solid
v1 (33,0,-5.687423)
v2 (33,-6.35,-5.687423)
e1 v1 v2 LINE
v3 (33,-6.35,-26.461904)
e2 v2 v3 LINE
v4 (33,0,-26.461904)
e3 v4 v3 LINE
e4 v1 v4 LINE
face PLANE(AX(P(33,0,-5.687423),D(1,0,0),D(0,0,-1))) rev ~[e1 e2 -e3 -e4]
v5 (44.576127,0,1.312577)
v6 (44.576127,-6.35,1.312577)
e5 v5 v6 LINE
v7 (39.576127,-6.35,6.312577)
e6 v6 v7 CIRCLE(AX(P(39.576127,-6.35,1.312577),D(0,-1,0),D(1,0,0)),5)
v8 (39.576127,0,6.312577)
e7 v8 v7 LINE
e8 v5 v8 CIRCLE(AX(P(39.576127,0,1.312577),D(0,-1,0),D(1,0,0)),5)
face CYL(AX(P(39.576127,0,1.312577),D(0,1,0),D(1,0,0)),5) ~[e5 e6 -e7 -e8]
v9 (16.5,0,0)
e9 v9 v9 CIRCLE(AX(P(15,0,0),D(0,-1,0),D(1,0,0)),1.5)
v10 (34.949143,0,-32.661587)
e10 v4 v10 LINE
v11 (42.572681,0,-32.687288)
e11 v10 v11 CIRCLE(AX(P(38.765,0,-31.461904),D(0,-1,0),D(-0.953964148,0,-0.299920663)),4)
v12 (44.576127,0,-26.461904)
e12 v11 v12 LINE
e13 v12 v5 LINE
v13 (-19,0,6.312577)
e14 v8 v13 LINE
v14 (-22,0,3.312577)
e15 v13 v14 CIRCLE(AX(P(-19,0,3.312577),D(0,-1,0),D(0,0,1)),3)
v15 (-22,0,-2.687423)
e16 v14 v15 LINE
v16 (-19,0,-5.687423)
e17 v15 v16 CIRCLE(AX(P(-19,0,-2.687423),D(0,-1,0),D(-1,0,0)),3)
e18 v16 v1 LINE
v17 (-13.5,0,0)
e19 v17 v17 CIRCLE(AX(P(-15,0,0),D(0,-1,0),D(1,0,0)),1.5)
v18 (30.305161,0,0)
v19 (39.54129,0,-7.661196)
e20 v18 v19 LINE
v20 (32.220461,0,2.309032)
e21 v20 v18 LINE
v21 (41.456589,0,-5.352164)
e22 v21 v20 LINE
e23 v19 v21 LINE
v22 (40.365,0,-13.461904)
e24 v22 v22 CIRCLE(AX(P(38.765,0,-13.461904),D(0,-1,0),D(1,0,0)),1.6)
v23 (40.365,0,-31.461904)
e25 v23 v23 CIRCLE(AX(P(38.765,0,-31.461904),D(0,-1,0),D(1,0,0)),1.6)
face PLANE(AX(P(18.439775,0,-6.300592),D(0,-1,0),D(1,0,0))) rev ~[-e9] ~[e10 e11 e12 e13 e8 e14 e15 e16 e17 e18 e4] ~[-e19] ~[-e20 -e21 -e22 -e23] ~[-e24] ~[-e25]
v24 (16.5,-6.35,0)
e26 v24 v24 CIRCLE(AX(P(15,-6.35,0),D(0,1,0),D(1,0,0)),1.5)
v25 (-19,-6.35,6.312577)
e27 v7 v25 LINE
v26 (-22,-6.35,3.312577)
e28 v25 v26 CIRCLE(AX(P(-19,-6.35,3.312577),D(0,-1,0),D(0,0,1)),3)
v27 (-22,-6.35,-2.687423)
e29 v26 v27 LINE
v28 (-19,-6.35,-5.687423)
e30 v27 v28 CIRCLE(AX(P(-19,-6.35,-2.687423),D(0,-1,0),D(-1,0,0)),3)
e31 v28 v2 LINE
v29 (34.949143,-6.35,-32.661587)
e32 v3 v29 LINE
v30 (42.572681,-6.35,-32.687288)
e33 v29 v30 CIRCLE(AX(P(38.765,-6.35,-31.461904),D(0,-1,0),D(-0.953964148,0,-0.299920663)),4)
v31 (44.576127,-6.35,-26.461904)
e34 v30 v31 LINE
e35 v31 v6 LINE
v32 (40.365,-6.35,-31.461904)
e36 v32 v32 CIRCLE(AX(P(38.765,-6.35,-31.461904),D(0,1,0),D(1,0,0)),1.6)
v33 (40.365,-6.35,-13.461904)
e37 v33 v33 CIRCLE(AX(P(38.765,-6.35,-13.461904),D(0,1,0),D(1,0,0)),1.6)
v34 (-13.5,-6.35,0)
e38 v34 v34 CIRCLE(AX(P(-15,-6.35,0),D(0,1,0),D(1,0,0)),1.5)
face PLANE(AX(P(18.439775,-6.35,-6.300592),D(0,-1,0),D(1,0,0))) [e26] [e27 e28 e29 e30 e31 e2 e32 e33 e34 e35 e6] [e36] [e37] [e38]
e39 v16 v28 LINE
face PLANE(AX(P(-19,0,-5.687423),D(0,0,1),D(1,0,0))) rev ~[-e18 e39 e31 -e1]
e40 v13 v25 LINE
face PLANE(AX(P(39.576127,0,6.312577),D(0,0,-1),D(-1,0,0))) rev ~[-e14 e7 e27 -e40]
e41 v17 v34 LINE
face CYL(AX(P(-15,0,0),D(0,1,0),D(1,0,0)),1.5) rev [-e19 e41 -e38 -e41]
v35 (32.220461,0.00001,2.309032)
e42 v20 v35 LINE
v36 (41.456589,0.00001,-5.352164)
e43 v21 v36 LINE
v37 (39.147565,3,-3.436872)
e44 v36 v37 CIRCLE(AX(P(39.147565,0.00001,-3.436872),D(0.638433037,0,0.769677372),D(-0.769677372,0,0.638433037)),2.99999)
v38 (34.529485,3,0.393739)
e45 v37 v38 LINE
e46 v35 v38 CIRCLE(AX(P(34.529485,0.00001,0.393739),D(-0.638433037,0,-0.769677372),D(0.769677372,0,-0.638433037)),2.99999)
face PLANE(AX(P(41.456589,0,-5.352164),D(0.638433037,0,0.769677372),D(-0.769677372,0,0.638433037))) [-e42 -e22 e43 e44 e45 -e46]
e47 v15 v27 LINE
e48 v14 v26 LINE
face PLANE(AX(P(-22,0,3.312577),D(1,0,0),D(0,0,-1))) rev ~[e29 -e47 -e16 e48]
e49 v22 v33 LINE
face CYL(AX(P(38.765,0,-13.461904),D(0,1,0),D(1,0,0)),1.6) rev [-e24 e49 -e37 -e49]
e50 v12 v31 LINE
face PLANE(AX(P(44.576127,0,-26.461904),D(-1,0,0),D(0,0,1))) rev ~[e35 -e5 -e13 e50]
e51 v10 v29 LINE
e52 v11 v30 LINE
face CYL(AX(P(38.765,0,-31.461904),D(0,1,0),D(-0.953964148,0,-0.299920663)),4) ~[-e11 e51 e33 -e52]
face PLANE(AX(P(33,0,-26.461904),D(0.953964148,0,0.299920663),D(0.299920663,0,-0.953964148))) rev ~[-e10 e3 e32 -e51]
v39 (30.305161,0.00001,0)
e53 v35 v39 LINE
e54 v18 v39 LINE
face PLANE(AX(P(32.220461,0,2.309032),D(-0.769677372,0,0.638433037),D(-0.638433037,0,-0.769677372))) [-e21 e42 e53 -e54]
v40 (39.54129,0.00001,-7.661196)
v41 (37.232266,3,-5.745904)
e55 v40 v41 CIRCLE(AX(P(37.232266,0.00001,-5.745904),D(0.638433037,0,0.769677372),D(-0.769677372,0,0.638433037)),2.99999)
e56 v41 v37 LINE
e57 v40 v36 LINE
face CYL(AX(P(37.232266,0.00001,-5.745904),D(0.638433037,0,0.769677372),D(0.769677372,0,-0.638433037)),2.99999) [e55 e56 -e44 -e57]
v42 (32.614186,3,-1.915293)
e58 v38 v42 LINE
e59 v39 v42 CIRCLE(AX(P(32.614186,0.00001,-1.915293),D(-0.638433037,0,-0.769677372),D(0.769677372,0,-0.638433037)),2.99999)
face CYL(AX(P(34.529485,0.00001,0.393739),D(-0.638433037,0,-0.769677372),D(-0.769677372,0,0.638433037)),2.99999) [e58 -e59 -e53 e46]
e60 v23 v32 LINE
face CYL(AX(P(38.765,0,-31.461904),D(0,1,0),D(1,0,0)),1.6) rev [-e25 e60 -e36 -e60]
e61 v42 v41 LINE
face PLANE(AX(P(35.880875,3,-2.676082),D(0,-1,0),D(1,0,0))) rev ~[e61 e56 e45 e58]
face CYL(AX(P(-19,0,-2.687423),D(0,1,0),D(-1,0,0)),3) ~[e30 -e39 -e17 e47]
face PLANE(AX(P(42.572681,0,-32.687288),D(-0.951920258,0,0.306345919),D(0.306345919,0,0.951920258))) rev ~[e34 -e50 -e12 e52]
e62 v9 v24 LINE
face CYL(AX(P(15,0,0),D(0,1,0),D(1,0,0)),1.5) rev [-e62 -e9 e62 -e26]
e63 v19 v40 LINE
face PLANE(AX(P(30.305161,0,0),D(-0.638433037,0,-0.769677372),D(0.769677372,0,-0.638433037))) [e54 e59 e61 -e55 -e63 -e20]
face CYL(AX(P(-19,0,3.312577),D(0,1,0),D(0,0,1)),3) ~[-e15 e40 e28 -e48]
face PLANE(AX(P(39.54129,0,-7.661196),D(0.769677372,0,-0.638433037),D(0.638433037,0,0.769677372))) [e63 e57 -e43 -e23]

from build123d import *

# Parameters (mm, degrees)
F1_DEPTH = 6.35
F2_R     = 1.5
F2_R_2   = 1.6
F3_DEPTH = 6.351
F5_DEPTH = 3
F6_R     = 2.99999


# Not quite as in the source:
# - a fillet or chamfer is up to 0.001 mm smaller than in the source, because OpenCascade refuses the exact size


with BuildPart() as f1:
    # F0 (on Front) → F1 (new body)
    with BuildSketch(Plane.XZ):
        with BuildLine():
            Line((33, 6.3125771578), (-19, 6.3125771578))
            ThreePointArc((-19, 6.3125771578), (-21.1213203436, 5.4338975014), (-22, 3.3125771578))
            Line((-22, 3.3125771578), (-22, -2.6874228422))
            ThreePointArc((-22, -2.6874228422), (-21.1213203436, -4.8087431858), (-19, -5.6874228422))
            Line((-19, -5.6874228422), (33, -5.6874228422))
            Line((33, -5.6874228422), (33, -18.461904466))
            Line((33, -18.461904466), (33, -26.461904466))
            Line((33, -26.461904466), (34.9491434073, -32.6615871174))
            ThreePointArc((34.9491434073, -32.6615871174), (38.7515149865, -35.4618817353), (42.5726810332, -32.6872881404))
            Line((42.5726810332, -32.6872881404), (44.5761270821, -26.461904466))
            Line((44.5761270821, -26.461904466), (44.5761270821, -18.461904466))
            Line((44.5761270821, -18.461904466), (44.5761270821, 1.3125771578))
            ThreePointArc((44.5761270821, 1.3125771578), (43.111660988, 4.8481110637), (39.5761270821, 6.3125771578))
            Line((39.5761270821, 6.3125771578), (33, 6.3125771578))
        make_face()
    extrude(amount=F1_DEPTH)

    # F2 (on face) → F3 (cut, through all)
    with BuildSketch(Plane.XZ):
        with Locations((-15, 0)):
            Circle(F2_R)
        with Locations((15, 0)):
            Circle(F2_R)
        with Locations((38.765, -13.461904466)):
            Circle(F2_R_2)
        with Locations((38.765, -31.461904466)):
            Circle(F2_R_2)
    extrude(amount=F3_DEPTH, mode=Mode.SUBTRACT)

    # F4 (on face) → F5 (join)
    with BuildSketch(Plane.XZ):
        Polygon((41.4565890705, -5.352164329), (32.2204606053, 2.3090321163), (30.305161494, 0), (39.5412899592, -7.6611964453), align=None)
    extrude(amount=-F5_DEPTH)

    # F6 (radius 3 in the source; OpenCascade refuses exactly that, so slightly less here)
    f6_edges = [f1.edges().sort_by_distance(p)[0] for p in [
        (31.262811, 3, 1.154516),
        (40.49894, 3, -6.50668),
    ]]
    fillet(f6_edges, radius=F6_R)


solid = f1.part
